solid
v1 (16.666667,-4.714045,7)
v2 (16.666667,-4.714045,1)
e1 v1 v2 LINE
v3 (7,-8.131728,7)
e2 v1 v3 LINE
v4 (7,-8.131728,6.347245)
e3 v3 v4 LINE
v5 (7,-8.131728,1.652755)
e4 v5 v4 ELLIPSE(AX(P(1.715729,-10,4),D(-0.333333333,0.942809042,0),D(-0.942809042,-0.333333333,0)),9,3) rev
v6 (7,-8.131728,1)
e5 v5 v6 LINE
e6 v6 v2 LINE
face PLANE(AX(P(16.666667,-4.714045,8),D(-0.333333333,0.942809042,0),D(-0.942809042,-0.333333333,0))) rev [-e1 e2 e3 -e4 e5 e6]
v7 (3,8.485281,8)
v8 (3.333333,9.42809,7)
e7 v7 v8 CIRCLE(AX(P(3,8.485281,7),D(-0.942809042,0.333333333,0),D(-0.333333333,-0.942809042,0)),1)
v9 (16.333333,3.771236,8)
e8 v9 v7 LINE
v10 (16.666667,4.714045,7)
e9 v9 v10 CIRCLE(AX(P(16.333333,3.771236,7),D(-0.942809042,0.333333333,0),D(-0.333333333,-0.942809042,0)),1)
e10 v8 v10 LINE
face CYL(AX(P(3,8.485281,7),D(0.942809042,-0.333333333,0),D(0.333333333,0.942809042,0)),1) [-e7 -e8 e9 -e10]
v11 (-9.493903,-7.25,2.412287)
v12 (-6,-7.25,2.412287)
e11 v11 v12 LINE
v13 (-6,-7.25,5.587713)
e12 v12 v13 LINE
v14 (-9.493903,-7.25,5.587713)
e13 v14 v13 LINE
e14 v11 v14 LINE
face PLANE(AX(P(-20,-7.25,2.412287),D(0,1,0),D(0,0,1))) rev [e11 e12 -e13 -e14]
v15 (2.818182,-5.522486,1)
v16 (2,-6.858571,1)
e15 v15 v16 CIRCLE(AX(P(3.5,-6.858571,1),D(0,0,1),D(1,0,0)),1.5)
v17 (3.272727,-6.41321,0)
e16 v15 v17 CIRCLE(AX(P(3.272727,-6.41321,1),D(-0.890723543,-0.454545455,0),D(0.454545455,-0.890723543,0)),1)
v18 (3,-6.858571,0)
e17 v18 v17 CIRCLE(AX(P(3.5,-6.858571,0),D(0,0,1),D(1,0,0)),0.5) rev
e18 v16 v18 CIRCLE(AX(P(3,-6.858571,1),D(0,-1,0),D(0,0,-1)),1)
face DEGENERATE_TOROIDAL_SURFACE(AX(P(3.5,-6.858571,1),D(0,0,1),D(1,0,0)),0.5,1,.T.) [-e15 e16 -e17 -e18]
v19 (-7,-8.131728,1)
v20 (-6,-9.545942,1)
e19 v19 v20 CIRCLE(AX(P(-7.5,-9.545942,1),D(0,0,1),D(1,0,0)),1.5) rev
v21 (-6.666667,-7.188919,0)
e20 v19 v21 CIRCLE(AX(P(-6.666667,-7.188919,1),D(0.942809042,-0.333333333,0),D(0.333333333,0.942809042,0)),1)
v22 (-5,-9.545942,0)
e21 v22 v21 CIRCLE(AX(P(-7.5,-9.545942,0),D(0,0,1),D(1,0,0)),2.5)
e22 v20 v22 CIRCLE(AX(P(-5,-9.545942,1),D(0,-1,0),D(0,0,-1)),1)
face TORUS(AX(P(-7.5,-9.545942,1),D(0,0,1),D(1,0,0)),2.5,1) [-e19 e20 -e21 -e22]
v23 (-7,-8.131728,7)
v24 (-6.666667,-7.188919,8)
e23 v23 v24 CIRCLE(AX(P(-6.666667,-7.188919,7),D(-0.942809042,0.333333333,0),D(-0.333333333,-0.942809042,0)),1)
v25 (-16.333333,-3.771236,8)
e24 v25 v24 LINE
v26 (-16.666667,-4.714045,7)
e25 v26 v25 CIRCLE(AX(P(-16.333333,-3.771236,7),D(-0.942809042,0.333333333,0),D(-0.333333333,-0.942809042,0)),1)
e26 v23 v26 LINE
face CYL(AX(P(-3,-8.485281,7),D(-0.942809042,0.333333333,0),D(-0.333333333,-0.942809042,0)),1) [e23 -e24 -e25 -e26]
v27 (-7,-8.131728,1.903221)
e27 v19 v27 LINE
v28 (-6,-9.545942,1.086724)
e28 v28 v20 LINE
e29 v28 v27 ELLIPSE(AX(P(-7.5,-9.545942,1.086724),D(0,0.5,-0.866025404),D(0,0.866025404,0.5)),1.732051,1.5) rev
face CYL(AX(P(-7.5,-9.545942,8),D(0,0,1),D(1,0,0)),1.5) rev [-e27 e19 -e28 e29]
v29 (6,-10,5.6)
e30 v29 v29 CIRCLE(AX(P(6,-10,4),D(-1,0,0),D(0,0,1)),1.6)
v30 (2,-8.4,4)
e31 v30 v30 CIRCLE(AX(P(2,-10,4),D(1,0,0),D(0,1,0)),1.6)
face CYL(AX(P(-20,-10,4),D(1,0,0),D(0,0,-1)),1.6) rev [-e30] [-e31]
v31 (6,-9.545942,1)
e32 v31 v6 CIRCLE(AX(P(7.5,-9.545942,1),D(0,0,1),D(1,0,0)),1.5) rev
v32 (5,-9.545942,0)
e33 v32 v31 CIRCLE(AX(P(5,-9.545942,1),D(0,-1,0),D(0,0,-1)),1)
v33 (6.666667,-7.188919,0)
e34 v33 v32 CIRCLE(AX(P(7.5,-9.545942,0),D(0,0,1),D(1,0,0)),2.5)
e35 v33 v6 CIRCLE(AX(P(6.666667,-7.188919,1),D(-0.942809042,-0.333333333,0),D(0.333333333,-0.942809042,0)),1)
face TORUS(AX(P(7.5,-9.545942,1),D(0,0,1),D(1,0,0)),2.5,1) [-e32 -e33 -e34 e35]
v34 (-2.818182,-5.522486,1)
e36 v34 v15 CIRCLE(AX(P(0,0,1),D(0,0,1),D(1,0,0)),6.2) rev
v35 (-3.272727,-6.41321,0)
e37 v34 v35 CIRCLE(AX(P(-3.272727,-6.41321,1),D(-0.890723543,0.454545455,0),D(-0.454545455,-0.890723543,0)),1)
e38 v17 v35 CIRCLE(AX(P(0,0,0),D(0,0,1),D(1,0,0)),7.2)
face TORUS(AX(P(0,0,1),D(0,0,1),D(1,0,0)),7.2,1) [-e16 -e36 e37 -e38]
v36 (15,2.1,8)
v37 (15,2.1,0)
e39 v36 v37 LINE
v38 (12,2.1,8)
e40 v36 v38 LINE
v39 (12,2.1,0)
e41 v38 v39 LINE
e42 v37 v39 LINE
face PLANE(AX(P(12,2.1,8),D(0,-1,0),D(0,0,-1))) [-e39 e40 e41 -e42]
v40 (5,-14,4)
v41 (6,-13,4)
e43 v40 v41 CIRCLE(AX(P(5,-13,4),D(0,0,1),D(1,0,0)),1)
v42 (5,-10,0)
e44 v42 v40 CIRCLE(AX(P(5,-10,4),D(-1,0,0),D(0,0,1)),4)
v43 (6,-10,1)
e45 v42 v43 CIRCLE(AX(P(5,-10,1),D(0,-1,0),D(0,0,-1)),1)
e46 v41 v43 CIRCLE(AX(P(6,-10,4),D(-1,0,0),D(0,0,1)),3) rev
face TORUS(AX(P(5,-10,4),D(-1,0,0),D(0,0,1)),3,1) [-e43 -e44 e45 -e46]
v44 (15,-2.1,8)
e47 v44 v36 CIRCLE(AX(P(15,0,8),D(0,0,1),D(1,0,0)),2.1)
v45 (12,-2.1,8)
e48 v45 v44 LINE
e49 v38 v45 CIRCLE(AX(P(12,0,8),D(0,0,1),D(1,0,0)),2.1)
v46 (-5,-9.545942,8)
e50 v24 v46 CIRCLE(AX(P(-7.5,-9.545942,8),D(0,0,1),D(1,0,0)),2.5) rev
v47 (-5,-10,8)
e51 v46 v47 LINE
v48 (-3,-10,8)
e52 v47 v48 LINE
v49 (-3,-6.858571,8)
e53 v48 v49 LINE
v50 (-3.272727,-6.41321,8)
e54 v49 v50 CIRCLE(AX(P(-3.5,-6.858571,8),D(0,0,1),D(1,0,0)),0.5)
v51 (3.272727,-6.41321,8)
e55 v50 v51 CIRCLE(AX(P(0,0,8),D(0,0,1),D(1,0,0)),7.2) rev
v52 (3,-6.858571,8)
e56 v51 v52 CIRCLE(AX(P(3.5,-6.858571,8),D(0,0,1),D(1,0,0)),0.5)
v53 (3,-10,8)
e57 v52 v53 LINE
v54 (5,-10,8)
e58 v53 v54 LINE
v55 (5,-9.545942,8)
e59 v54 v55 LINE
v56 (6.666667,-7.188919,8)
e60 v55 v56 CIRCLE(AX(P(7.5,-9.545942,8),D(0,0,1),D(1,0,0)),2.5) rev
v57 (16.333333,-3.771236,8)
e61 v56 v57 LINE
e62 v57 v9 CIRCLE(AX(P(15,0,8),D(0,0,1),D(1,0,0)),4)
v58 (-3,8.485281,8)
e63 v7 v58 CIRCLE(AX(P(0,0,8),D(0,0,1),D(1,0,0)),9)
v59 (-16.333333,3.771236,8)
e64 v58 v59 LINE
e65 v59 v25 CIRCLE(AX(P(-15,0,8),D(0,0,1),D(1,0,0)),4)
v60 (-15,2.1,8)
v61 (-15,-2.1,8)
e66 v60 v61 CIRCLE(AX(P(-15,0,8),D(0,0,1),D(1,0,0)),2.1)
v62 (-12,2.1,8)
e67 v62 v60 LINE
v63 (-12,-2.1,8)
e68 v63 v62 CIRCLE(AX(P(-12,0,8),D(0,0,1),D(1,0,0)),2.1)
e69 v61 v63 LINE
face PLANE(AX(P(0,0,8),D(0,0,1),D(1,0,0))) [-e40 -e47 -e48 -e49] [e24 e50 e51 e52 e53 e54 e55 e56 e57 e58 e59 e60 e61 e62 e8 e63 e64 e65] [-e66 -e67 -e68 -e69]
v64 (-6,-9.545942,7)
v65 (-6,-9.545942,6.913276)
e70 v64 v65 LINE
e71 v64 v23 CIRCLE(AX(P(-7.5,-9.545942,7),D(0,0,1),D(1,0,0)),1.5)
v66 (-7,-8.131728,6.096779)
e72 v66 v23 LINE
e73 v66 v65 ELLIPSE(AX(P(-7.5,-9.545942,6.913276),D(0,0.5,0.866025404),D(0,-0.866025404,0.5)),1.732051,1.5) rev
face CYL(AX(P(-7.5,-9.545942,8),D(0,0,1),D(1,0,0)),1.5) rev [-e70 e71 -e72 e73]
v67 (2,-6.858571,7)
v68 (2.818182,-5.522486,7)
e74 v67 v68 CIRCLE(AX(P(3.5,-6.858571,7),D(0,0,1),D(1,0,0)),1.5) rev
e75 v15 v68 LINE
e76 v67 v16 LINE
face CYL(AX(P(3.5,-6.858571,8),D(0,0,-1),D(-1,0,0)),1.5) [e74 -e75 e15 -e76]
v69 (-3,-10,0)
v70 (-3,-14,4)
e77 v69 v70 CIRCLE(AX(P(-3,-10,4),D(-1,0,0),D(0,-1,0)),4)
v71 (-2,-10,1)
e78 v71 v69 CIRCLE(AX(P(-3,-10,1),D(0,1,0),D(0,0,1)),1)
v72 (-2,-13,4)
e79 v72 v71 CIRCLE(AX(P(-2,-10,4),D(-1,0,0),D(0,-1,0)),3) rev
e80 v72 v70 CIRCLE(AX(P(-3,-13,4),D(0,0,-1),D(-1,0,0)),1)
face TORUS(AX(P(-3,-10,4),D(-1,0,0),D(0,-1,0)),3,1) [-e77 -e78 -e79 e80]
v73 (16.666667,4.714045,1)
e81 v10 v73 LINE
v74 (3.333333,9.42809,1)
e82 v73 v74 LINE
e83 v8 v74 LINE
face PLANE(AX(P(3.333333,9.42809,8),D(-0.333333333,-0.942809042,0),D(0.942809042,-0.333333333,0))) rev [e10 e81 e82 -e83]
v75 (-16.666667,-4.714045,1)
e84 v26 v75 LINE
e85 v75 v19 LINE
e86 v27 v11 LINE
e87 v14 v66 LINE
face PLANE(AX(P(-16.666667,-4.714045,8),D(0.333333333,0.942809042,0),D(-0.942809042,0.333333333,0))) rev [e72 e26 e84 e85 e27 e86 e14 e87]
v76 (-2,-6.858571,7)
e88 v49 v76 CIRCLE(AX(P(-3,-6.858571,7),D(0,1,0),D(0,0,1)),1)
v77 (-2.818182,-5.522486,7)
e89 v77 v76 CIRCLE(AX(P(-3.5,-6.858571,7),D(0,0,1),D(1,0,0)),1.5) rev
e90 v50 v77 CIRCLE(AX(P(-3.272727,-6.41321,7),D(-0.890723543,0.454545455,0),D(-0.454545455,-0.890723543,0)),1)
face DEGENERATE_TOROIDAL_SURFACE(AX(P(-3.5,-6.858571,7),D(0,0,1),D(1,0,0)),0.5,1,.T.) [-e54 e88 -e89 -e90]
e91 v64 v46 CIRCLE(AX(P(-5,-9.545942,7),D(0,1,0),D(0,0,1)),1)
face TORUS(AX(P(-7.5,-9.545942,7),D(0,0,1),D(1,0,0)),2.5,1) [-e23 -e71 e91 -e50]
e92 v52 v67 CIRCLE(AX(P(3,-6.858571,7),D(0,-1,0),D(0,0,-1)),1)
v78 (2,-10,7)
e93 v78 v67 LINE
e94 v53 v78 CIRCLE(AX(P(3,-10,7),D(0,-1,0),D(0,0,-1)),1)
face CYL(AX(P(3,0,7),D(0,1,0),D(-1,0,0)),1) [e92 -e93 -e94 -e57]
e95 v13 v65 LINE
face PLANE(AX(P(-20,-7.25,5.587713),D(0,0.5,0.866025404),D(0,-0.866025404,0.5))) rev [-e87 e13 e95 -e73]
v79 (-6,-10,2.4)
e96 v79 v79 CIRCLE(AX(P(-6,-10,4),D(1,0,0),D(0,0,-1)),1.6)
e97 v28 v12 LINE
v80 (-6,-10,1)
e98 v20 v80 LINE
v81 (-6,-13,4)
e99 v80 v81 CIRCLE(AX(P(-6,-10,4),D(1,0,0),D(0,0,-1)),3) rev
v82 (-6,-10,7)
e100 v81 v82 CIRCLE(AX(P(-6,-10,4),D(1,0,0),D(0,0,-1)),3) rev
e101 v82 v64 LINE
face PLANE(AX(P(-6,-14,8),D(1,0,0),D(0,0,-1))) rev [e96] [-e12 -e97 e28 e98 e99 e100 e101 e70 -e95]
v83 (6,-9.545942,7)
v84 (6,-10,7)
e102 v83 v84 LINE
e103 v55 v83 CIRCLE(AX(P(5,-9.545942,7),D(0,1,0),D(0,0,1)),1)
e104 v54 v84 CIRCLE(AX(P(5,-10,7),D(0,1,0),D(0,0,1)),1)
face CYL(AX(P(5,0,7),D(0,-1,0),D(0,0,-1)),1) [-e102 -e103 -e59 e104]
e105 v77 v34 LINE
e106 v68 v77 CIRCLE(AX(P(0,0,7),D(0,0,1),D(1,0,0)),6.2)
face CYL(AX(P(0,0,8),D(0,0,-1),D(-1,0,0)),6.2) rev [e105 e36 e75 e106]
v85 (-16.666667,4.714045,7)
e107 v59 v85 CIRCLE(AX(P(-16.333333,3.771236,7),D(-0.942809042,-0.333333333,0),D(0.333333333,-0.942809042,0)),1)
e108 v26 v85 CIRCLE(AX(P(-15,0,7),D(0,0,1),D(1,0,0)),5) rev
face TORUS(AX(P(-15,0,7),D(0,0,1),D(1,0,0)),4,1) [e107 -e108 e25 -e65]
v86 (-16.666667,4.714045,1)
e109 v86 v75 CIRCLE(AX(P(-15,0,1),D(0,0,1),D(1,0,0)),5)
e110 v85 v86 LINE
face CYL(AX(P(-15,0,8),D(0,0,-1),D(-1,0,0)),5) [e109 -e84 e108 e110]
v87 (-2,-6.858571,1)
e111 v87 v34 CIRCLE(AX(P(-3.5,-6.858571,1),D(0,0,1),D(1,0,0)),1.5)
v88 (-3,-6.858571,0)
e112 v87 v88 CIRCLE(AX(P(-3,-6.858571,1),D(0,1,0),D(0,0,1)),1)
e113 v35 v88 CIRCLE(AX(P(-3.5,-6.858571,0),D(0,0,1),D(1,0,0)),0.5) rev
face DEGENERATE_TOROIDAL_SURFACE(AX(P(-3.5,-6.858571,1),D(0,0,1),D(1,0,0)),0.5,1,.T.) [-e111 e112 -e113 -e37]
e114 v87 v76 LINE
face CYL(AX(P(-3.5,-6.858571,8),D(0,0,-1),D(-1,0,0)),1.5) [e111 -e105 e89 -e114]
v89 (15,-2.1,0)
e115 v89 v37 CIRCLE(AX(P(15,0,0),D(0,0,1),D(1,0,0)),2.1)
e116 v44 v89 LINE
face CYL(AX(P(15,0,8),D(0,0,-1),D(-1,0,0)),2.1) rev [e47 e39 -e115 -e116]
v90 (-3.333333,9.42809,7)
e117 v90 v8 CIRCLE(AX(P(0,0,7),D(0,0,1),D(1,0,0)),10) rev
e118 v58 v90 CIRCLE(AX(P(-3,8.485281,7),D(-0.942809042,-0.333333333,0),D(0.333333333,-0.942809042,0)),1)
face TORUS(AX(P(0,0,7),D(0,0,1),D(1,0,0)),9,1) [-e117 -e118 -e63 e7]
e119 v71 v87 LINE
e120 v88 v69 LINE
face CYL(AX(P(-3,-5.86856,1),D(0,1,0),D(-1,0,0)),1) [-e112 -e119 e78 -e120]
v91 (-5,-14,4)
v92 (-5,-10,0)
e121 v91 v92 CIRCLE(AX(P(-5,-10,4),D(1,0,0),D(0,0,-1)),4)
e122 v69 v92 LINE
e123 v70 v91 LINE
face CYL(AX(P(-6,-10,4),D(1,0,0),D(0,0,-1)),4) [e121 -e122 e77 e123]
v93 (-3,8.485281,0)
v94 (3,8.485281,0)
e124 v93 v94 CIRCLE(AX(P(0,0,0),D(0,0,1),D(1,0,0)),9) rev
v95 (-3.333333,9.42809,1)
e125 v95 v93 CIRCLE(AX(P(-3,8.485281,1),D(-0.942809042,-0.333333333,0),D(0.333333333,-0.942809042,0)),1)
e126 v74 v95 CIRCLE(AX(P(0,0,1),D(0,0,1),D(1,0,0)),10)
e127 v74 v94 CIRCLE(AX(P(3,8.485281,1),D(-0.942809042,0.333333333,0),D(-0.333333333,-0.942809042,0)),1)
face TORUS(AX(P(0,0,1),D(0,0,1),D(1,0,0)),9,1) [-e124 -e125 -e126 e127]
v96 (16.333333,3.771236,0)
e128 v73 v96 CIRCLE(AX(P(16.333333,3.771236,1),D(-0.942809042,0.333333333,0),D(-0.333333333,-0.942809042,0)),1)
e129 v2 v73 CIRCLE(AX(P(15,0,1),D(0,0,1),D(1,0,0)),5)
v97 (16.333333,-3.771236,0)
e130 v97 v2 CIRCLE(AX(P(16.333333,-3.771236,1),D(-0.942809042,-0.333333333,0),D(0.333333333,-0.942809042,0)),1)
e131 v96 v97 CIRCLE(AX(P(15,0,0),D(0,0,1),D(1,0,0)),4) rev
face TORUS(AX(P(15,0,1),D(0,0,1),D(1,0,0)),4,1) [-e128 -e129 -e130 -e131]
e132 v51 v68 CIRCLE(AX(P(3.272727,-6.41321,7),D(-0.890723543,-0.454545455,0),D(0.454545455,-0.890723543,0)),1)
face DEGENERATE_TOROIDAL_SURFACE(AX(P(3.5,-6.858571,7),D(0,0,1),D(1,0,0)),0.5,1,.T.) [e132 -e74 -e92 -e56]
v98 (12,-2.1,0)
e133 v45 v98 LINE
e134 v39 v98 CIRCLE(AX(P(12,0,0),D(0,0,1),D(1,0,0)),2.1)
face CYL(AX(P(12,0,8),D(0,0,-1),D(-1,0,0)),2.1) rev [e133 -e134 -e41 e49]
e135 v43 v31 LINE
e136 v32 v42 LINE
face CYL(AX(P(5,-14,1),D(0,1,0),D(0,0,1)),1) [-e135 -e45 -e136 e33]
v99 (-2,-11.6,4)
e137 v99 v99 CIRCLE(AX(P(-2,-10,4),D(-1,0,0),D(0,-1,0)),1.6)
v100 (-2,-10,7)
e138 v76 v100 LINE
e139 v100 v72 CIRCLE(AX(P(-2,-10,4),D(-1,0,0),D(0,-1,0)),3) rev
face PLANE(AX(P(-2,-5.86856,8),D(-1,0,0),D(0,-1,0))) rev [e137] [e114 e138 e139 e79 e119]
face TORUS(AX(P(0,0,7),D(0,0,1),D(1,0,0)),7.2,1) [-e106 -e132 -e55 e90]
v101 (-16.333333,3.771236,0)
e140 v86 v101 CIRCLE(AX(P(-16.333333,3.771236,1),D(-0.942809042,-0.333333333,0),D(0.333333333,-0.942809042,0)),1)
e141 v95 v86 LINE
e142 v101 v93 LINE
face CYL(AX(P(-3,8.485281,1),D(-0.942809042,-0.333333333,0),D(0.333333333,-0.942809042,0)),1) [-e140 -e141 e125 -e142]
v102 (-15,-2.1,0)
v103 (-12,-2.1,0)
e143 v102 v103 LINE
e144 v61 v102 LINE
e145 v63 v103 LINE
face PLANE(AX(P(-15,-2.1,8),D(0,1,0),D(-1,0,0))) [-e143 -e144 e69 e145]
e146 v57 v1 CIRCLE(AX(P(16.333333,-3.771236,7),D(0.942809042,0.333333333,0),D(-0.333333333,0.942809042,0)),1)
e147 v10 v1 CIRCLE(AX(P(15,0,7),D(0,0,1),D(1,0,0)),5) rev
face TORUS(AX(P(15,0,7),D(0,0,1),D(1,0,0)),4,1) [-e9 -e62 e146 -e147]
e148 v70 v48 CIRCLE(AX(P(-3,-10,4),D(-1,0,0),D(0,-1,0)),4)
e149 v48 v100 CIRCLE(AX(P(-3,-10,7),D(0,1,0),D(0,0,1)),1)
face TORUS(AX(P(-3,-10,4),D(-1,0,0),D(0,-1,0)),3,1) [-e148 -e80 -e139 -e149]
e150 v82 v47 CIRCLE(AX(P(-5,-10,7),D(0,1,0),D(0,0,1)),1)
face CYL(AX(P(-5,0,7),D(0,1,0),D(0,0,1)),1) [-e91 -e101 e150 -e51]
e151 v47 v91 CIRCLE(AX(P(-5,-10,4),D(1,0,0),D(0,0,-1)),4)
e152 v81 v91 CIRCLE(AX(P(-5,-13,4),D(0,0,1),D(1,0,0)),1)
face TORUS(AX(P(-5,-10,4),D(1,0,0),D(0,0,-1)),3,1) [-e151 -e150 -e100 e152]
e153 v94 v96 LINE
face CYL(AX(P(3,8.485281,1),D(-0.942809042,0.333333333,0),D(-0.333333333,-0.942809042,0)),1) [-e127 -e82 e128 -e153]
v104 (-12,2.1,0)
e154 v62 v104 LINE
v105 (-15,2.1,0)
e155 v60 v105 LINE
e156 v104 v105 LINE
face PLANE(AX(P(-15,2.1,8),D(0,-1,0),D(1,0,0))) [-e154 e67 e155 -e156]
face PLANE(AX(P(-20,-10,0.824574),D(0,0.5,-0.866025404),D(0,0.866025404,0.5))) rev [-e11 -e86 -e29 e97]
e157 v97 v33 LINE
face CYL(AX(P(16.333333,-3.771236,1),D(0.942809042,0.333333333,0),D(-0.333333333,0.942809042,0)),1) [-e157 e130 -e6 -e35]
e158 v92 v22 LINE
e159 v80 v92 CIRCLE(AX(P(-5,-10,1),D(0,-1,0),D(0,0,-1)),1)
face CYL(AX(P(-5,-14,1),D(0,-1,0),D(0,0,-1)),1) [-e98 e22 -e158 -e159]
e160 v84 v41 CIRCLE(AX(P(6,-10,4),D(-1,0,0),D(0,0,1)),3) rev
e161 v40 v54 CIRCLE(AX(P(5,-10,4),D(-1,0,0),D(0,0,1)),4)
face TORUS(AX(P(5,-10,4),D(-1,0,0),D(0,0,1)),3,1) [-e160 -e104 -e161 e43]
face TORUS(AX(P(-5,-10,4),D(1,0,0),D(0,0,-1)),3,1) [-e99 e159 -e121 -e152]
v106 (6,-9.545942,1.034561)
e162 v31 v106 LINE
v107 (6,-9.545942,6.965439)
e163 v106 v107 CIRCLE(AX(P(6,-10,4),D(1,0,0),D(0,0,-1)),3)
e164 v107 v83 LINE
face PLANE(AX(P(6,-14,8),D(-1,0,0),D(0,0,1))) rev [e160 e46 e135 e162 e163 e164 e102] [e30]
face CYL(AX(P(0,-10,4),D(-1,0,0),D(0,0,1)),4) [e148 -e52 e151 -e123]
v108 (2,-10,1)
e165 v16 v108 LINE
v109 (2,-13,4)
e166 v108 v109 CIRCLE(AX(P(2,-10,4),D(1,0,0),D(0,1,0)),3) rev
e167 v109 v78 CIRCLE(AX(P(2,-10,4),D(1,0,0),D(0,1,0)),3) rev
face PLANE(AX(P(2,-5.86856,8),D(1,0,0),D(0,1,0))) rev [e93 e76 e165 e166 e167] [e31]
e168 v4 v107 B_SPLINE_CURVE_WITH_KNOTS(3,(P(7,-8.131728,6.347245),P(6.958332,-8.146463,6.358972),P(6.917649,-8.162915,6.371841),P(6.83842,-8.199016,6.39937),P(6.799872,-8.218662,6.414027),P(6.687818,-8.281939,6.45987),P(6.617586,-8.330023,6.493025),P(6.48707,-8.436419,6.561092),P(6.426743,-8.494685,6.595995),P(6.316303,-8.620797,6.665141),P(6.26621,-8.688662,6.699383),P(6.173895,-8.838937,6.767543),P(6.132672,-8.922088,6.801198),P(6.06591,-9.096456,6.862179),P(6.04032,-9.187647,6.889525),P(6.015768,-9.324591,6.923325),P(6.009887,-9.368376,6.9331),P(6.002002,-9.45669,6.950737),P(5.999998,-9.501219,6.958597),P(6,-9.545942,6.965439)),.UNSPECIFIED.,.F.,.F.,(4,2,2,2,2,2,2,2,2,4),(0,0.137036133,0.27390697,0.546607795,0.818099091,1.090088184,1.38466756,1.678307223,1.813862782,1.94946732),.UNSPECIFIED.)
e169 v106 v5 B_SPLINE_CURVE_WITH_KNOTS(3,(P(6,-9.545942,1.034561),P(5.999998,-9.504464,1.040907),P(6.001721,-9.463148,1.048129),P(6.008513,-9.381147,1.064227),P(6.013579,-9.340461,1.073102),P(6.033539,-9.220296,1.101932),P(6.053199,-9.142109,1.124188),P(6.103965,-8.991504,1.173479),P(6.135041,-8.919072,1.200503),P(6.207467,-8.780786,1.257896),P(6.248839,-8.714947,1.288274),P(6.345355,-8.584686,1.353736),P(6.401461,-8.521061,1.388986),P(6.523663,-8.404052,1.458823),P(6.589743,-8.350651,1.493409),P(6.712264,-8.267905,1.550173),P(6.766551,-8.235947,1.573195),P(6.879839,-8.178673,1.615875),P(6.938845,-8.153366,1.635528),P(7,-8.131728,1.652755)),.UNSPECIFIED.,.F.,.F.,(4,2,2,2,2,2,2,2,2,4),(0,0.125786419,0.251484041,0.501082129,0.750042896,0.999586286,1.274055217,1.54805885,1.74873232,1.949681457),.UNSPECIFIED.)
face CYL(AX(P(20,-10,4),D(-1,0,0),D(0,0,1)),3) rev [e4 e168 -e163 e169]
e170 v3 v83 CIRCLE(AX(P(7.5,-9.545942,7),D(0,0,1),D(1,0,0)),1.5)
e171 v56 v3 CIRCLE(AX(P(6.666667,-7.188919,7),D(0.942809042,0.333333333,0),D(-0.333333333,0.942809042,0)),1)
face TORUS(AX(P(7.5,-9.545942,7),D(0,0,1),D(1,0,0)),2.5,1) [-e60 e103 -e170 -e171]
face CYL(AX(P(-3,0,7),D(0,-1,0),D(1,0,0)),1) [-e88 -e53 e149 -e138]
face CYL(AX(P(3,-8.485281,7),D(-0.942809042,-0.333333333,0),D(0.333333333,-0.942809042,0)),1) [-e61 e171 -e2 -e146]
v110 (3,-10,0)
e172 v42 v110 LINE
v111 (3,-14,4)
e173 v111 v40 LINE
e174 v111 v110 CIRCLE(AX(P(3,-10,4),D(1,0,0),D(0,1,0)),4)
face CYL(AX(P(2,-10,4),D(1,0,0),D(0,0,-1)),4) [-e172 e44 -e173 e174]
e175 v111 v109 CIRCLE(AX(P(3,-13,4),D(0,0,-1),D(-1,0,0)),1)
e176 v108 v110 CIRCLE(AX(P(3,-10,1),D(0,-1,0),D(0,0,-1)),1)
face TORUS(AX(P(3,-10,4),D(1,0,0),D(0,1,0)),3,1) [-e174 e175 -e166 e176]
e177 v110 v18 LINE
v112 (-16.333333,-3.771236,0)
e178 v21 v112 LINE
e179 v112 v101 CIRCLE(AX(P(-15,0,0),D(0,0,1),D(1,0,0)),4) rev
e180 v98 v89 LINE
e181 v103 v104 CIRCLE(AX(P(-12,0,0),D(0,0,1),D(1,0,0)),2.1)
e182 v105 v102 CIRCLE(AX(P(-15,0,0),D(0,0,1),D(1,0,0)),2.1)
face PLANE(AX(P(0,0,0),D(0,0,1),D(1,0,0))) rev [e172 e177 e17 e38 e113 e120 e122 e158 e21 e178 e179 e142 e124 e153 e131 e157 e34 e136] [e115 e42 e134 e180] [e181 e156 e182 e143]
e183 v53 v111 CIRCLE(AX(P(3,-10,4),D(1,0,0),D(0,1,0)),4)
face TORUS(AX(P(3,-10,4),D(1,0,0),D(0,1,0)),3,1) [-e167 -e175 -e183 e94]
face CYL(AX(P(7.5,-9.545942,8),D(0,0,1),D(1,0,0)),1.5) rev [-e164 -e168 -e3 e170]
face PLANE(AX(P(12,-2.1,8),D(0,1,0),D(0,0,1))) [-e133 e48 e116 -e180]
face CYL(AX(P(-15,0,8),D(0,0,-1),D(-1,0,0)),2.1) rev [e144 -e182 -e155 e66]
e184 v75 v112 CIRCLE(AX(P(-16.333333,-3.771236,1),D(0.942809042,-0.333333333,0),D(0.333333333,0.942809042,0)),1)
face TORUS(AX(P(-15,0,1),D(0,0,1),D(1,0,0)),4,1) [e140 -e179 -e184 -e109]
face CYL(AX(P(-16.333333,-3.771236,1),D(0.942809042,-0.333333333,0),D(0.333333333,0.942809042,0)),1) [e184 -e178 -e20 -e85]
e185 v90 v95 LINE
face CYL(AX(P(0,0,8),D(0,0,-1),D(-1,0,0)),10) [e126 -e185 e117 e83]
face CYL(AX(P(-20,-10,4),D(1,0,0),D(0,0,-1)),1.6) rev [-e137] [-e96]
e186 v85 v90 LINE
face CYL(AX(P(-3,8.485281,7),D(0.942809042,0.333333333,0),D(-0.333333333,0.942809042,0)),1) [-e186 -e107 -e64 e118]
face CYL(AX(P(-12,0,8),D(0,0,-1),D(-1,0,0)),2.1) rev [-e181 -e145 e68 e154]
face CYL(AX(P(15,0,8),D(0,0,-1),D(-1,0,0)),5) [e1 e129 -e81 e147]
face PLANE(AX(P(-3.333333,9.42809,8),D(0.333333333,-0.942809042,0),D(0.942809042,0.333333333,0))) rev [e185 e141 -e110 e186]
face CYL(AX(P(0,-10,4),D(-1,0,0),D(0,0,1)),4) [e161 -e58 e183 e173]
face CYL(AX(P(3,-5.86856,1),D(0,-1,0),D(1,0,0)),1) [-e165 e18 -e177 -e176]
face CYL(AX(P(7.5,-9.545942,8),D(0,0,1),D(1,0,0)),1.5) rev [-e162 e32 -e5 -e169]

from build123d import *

# Parameters (mm, degrees)
EXTRUDE_1_DEPTH     = 8
FILLET_4_R          = 1.5
CUT_EXTRUDE_START   = 10
SKETCH_2_R          = 1.6
CUT_EXTRUDE_1_DEPTH = 41.594117082
SKETCH_2_3_R        = 3
CUT_EXTRUDE_2_DEPTH = 31.594117108
CUT_EXTRUDE_START_2 = -12
CUT_EXTRUDE_3_DEPTH = 19.594117108
FILLET_1_R          = 4
FILLET_2_R          = 1


with BuildPart() as part:
    # Эскиз1 → Бобышка-Вытянуть1 (new body)
    with BuildSketch(Plane.XY):
        with BuildLine():
            Line((-3.333333333, 9.428090416), (-16.666666667, 4.714045208))
            ThreePointArc((-16.666666667, 4.714045208), (-20, 0), (-16.666666667, -4.714045208))
            Line((-16.666666667, -4.714045208), (-6, -8.485281374))
            Line((-6, -8.485281374), (-6, -14))
            Line((-6, -14), (-2, -14))
            Line((-2, -14), (-2, -5.8685603))
            ThreePointArc((-2, -5.8685603), (0, 6.2), (2, -5.8685603))
            Line((2, -5.8685603), (2, -14))
            Line((2, -14), (6, -14))
            Line((6, -14), (6, -8.485281374))
            Line((6, -8.485281374), (16.666666667, -4.714045208))
            ThreePointArc((16.666666667, -4.714045208), (20, 0), (16.666666667, 4.714045208))
            Line((16.666666667, 4.714045208), (3.333333333, 9.428090416))
            ThreePointArc((3.333333333, 9.428090416), (0, 10), (-3.333333333, 9.428090416))
        make_face()
        with BuildLine():
            Line((-15, 2.1), (-12, 2.1))
            ThreePointArc((-12, 2.1), (-9.9, 0), (-12, -2.1))
            Line((-12, -2.1), (-15, -2.1))
            ThreePointArc((-15, -2.1), (-17.1, 0), (-15, 2.1))
        make_face(mode=Mode.SUBTRACT)
        with BuildLine():
            Line((12, 2.1), (15, 2.1))
            ThreePointArc((15, 2.1), (17.1, 0), (15, -2.1))
            Line((15, -2.1), (12, -2.1))
            ThreePointArc((12, -2.1), (9.9, 0), (12, 2.1))
        make_face(mode=Mode.SUBTRACT)
    extrude(amount=EXTRUDE_1_DEPTH)

    # Скругление4
    fillet_4_edges = [part.edges().sort_by_distance(p)[0] for p in [
        (6, -8.485281374, 4),
        (2, -5.8685603, 4),
        (-2, -5.8685603, 4),
        (-6, -8.485281374, 4),
    ]]
    fillet(fillet_4_edges, radius=FILLET_4_R)

    # Эскиз2 → Вырез-Вытянуть1 (cut, through all)
    with BuildSketch(Plane(origin=(6, 0, 0), x_dir=(0, 0, -1), z_dir=(1, 0, 0)).offset(CUT_EXTRUDE_START)):
        with Locations(Location((-4, -10, 0), (0, 0, 16.486327524))):
            Circle(SKETCH_2_R)
    extrude(amount=-CUT_EXTRUDE_1_DEPTH, mode=Mode.SUBTRACT)

    # Эскиз2<3> → Вырез-Вытянуть2 (cut, through all)
    with BuildSketch(Plane(origin=(6, 0, 0), x_dir=(0, 0, -1), z_dir=(1, 0, 0))):
        with Locations((-4, -10)):
            Circle(SKETCH_2_3_R)
    extrude(amount=CUT_EXTRUDE_2_DEPTH, mode=Mode.SUBTRACT)

    # Эскиз2<4> → Вырез-Вытянуть3 (cut, through all)
    with BuildSketch(Plane(origin=(6, 0, 0), x_dir=(0, 0, -1), z_dir=(1, 0, 0)).offset(CUT_EXTRUDE_START_2)):
        Polygon((-0.824573519, -10), (-2.41228676, -7.25), (-5.58771324, -7.25), (-7.175426481, -10), (-5.58771324, -12.75), (-2.41228676, -12.75), align=None)
    extrude(amount=-CUT_EXTRUDE_3_DEPTH, mode=Mode.SUBTRACT)

    # Скругление1
    fillet_1_edges = [part.edges().sort_by_distance(p)[0] for p in [
        (4, -14, 8),
        (4, -14, 0),
        (-4, -14, 0),
        (-4, -14, 8),
    ]]
    fillet(fillet_1_edges, radius=FILLET_1_R - 0.0001)  # a hair under: the kernel refuses the full size

    # Скругление2
    fillet_2_edges = [part.edges().sort_by_distance(p)[0] for p in [
        (10, 7.071067812, 8),
        (0, 10, 8),
        (-2, -8.42933564, 8),
        (6, -9.773020773, 8),
        (6, -9.773020773, 0),
        (6, -12.828456414, 1.171543586),
        (6, -12.828456414, 6.828456414),
        (2, -12.828456414, 1.171543586),
        (2, -12.828456414, 6.828456414),
        (-2, -8.42933564, 0),
        (-2, -12.828456414, 6.828456414),
        (-2, -12.828456414, 1.171543586),
        (-6, -12.828456414, 6.828456414),
        (-6, -12.828456414, 1.171543586),
        (-11.833333333, -6.422886596, 0),
        (-20, 0, 0),
        (-10, 7.071067812, 8),
        (-10, 7.071067812, 0),
        (0, 10, 0),
        (10, 7.071067812, 0),
        (20, 0, 0),
        (-20, 0, 8),
        (-11.833333333, -6.422886596, 8),
        (0, 6.2, 0),
        (0, 6.2, 8),
        (11.833333333, -6.422886596, 0),
        (2, -8.42933564, 0),
        (20, 0, 8),
        (-6, -9.773020773, 0),
        (2.220795702, -6.075221828, 0),
        (-2.220795702, -6.075221828, 0),
        (11.833333333, -6.422886596, 8),
        (-6, -9.773020773, 8),
        (2, -8.42933564, 8),
        (2.220795702, -6.075221828, 8),
        (-2.220795702, -6.075221828, 8),
        (-6.275255129, -8.679916142, 0),
        (-6.275255129, -8.679916142, 8),
        (6.275255129, -8.679916142, 0),
        (6.275255129, -8.679916142, 8),
    ]]
    fillet(fillet_2_edges, radius=FILLET_2_R)


solid = part.part
